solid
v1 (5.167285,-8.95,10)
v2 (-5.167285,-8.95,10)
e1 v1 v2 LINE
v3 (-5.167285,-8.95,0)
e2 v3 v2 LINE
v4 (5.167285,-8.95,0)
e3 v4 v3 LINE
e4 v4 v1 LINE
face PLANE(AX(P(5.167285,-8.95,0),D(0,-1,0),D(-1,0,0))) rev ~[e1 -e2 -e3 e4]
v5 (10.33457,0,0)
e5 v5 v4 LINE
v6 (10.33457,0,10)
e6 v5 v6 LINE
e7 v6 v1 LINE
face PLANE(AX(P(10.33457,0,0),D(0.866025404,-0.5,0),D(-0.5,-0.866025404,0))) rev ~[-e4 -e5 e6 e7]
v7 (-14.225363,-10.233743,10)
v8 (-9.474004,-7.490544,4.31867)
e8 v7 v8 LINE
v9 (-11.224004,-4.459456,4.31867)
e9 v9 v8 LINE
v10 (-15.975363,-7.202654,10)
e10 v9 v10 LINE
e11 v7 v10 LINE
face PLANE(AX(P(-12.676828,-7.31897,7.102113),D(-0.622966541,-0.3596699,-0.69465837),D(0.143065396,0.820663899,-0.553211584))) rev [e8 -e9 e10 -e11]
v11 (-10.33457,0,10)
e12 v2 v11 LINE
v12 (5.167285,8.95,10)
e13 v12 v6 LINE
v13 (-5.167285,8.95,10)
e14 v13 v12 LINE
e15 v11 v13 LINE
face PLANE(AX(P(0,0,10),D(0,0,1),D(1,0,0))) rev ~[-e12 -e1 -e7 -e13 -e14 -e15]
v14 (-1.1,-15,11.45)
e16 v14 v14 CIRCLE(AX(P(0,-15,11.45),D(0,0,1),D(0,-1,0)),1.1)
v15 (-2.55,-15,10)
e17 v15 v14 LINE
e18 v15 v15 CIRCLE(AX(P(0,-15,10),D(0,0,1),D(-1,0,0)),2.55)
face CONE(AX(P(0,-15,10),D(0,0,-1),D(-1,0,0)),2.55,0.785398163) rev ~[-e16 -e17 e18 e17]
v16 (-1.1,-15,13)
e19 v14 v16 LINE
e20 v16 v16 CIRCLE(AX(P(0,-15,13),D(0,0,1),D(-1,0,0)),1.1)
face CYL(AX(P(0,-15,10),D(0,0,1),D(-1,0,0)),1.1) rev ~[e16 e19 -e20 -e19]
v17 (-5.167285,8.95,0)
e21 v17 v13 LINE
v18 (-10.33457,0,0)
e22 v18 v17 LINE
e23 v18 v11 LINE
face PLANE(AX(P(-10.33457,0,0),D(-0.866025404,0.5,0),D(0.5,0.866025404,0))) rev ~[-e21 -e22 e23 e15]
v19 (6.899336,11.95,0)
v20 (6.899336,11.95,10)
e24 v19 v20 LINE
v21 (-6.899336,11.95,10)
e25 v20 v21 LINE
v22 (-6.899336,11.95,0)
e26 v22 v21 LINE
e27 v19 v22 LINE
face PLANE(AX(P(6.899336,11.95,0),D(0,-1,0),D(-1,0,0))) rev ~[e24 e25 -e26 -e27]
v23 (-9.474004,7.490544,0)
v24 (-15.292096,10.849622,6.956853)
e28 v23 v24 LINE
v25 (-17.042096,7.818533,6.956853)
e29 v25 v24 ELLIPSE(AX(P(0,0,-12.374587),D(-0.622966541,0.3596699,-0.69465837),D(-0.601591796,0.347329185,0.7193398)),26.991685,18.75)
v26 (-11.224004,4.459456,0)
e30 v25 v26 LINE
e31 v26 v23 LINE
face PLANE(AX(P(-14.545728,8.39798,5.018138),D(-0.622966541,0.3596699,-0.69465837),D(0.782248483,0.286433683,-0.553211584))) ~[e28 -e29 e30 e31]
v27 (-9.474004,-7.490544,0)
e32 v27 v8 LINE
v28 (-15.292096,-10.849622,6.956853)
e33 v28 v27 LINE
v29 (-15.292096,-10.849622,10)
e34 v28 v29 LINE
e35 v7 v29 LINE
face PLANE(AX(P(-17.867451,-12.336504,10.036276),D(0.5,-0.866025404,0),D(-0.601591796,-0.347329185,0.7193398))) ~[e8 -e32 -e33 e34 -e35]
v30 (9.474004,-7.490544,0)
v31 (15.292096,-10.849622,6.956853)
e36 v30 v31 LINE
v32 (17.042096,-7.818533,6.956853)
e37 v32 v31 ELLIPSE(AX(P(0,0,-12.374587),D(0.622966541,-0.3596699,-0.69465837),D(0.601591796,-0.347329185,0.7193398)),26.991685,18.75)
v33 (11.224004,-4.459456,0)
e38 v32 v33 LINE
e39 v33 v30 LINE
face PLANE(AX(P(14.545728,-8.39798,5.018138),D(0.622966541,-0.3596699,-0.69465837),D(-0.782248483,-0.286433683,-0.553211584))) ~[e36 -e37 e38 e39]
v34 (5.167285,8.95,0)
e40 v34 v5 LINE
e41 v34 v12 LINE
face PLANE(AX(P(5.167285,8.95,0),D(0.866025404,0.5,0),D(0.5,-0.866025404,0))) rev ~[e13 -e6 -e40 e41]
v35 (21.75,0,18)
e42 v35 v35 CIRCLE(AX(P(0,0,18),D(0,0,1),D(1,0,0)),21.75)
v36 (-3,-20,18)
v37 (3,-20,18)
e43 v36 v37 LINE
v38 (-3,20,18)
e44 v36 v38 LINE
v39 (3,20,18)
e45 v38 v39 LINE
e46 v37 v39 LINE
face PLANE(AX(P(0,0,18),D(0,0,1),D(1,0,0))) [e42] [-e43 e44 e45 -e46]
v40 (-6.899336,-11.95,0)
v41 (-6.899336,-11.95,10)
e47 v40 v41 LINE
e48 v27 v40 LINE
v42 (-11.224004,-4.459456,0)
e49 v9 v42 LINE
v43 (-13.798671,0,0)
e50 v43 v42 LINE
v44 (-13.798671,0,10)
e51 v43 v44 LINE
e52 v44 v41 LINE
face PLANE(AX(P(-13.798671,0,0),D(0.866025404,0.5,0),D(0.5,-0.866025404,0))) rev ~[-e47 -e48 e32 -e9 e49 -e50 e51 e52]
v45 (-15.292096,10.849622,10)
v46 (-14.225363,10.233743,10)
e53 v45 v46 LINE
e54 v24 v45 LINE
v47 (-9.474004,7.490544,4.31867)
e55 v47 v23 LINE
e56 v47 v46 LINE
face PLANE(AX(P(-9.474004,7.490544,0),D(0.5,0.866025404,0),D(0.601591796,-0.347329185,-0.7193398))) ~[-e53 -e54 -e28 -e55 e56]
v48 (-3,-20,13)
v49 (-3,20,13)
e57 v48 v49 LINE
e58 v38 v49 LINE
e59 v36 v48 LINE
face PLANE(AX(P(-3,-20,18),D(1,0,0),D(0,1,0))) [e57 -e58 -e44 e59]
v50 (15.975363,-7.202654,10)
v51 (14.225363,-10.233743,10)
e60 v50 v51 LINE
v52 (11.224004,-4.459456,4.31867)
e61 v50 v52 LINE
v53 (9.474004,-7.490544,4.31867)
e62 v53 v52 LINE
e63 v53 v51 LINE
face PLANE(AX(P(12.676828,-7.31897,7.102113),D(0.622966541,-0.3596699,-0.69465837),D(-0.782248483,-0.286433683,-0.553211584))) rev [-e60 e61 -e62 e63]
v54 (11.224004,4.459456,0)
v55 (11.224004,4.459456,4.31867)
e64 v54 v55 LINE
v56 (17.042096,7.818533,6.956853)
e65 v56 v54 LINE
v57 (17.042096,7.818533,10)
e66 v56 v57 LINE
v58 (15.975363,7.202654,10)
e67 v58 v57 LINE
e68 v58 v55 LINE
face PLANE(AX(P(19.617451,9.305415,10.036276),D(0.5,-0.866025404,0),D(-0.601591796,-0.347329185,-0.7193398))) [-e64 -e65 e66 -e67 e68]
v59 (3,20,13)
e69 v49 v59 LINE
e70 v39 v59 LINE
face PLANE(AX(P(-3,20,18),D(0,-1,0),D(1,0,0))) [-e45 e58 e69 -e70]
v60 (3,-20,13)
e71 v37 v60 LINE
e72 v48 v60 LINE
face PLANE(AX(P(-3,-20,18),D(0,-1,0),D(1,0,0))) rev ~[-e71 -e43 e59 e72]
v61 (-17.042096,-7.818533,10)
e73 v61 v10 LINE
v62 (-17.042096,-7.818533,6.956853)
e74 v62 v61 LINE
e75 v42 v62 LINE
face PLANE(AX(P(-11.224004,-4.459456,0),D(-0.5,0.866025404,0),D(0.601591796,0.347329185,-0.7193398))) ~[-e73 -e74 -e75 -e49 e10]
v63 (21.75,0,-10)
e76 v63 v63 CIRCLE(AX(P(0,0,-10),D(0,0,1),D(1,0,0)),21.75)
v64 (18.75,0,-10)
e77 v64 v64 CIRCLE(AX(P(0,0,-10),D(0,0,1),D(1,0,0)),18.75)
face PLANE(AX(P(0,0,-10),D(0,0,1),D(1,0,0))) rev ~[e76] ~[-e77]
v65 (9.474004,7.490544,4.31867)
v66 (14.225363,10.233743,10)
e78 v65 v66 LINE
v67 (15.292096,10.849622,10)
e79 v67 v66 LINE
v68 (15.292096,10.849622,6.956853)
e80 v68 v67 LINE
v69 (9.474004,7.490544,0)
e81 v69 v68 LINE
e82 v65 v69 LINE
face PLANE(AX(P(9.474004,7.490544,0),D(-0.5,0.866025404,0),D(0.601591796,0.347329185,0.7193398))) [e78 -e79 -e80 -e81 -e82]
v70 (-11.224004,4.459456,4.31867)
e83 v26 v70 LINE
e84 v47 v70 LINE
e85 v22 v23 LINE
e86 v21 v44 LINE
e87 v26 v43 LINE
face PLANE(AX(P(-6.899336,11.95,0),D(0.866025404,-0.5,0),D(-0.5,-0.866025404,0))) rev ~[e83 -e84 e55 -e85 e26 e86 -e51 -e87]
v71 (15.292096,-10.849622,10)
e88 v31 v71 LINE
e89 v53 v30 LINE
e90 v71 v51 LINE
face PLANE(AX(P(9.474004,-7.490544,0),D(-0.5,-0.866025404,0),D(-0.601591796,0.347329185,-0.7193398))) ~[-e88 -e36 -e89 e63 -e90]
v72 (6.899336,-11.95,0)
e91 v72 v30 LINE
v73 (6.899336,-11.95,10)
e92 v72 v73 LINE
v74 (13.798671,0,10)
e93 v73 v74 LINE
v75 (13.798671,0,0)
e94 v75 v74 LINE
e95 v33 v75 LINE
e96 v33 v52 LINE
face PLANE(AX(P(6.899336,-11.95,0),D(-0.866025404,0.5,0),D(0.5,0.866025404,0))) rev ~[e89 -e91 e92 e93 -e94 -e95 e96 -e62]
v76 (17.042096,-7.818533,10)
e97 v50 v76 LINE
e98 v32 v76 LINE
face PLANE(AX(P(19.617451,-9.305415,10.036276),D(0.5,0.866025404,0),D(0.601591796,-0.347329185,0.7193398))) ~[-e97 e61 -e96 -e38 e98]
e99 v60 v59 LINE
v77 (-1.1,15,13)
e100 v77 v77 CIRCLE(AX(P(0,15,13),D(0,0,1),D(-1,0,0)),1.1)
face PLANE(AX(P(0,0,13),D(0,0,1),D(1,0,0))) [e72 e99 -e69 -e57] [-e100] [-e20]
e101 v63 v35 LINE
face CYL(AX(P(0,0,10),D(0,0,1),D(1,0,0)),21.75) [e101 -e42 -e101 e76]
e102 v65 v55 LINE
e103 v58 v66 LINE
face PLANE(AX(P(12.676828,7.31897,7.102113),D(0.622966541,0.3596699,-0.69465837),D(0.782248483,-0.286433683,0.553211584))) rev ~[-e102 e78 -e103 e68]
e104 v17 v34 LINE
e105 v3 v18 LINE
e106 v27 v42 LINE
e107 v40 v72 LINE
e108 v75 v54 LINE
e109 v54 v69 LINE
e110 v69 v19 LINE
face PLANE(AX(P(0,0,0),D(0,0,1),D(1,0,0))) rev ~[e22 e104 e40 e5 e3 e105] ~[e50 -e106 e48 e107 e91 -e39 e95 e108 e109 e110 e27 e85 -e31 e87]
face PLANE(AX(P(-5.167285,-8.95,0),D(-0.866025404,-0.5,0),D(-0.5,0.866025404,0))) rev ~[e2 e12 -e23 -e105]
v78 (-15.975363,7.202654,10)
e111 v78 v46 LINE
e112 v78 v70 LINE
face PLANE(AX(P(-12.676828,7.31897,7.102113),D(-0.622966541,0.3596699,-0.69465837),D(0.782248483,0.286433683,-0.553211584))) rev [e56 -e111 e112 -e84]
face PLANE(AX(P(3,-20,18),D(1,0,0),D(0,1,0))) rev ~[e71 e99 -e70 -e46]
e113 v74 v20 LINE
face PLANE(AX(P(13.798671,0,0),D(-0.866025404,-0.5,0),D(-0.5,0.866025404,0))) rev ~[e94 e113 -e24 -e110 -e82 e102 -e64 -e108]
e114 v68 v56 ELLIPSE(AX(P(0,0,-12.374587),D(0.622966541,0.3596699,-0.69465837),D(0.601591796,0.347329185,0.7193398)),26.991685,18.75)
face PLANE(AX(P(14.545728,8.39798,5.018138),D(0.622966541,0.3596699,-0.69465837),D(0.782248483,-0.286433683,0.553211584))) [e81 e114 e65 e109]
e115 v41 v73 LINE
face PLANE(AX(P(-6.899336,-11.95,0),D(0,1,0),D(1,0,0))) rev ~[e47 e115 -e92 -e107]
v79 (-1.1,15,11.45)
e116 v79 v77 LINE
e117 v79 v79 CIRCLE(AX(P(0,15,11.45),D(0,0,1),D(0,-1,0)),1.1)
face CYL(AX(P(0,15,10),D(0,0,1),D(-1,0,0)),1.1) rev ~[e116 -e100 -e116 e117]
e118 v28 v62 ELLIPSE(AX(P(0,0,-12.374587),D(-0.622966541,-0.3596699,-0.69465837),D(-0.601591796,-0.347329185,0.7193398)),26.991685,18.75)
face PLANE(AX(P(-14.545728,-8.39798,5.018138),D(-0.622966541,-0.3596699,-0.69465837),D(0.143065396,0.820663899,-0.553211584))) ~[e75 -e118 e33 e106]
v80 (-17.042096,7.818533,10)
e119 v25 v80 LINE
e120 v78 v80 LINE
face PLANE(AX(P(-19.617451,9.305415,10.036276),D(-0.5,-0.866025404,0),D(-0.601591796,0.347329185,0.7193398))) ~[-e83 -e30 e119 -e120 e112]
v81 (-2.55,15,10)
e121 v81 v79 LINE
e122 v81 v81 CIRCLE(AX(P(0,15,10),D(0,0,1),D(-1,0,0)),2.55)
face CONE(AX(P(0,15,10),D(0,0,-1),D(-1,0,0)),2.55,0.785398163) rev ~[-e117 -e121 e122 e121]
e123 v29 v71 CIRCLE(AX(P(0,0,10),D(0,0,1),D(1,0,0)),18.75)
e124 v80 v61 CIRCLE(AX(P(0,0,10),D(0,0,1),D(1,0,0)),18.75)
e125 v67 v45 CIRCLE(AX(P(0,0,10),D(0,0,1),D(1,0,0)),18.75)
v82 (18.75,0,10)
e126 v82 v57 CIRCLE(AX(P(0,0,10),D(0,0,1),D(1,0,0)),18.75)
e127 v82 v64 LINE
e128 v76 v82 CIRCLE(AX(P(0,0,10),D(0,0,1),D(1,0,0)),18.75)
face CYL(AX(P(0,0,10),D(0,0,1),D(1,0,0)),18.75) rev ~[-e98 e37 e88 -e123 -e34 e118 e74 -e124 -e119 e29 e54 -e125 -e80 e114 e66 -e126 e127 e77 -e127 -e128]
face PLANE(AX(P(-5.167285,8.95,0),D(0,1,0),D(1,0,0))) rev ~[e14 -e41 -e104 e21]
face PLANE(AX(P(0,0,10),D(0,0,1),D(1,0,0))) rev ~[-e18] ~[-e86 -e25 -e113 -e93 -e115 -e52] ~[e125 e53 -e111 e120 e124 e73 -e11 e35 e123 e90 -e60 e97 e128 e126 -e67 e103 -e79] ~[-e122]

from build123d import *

# Parameters (mm, degrees)
F1_DEPTH        = 10
F2_R            = 21.75
F2_R_2          = 18.75
F3_DEPTH        = 20
F4_DEPTH        = 8
F7_DEPTH        = 3
F8_W            = 6
F8_H            = 40
F9_DEPTH        = 5
F11_D           = 2.2
F11_CSINK_D     = 5.1
F11_CSINK_ANGLE = 90


# Not quite as in the source:
# - a pattern or mirror of a feature is missing from the dataset's text; its kind, count and spacing are read off the source's solid


with BuildPart() as f1:
    # F0 (on Top) → F1 (new body)
    with BuildSketch(Plane.XY):
        Polygon((6.8993357168, 11.95), (-6.8993357168, 11.95), (-13.7986714336, 0), (-6.8993357168, -11.95), (6.8993357168, -11.95), (13.7986714336, 0), align=None)
        Polygon((-10.3345698185, 0), (-5.1672849092, 8.95), (5.1672849092, 8.95), (10.3345698185, 0), (5.1672849092, -8.95), (-5.1672849092, -8.95), align=None, mode=Mode.SUBTRACT)
    extrude(amount=F1_DEPTH)



with BuildPart() as f3:
    # F2 (on face) → F3 (new body)
    with BuildSketch(Plane.XY.offset(10)):
        Circle(F2_R)
        Circle(F2_R_2, mode=Mode.SUBTRACT)
    extrude(amount=-F3_DEPTH)


with BuildPart() as f4:
    # F2 (on face) → F4 (new body)
    with BuildSketch(Plane.XY.offset(10)):
        Circle(F2_R)
        Circle(F2_R_2, mode=Mode.SUBTRACT)
        Circle(F2_R_2)
        Polygon((6.8993357168, 11.95), (13.7986714336, 0), (6.8993357168, -11.95), (-6.8993357168, -11.95), (-13.7986714336, 0), (-6.8993357168, 11.95), align=None, mode=Mode.SUBTRACT)
        Polygon((6.8993357168, -11.95), (13.7986714336, 0), (6.8993357168, 11.95), (-6.8993357168, 11.95), (-13.7986714336, 0), (-6.8993357168, -11.95), align=None)
        Polygon((5.1672849092, -8.95), (-5.1672849092, -8.95), (-10.3345698185, 0), (-5.1672849092, 8.95), (5.1672849092, 8.95), (10.3345698185, 0), align=None, mode=Mode.SUBTRACT)
        Polygon((-10.3345698185, 0), (-5.1672849092, -8.95), (5.1672849092, -8.95), (10.3345698185, 0), (5.1672849092, 8.95), (-5.1672849092, 8.95), align=None)
    extrude(amount=F4_DEPTH)


with BuildPart() as f1_1:
    add(f1.part)

    add(f3.part)  # F7 merges F3

    add(f4.part)  # F7 merges F4
    # F6 (on face) → F7 (join)
    with BuildSketch(Plane(origin=(5.3550892957, 3.0917622464, -5.9713601914), x_dir=(0.7822484827, -0.2864336826, 0.5532115841), z_dir=(0.622966541, 0.3596699002, -0.6946583705))):
        Polygon((7.5026214932, -3.9601203317), (5.2654806886, -6.6518114397), (15.9953805493, -15.5697354674), (18.2325213539, -12.8780443594), align=None)
    f7 = extrude(amount=-F7_DEPTH)

    # F7_copies: F7 across plane
    add(f7.mirror(Plane(origin=(0, 0, 0), x_dir=(0, 0, -1), z_dir=(0, -1, 0))))

    # F7_copies1: F7 across plane
    add(f7.mirror(Plane(origin=(0, 0, 0), x_dir=(0, 0, -1), z_dir=(-1, 0, 0))))

    # F7_copies2: F7 across plane
    add(f7.mirror(Plane(origin=(0, 0, 0), x_dir=(0.5, -0.8660254038, 0), z_dir=(-0.8660254038, -0.5, 0))))

    # F8 (on face) → F9 (cut)
    with BuildSketch(Plane.XY.offset(18)):
        Rectangle(F8_W, F8_H)
    extrude(amount=-F9_DEPTH, mode=Mode.SUBTRACT)

    # F11 (through all)
    with Locations(Plane(origin=(0, 0, 10), x_dir=(1, 0, 0), z_dir=(0, 0, -1))):
        with Locations((0, 15), (0, -15)):
            CounterSinkHole(F11_D / 2, F11_CSINK_D / 2, counter_sink_angle=F11_CSINK_ANGLE)


solid = f1_1.part
